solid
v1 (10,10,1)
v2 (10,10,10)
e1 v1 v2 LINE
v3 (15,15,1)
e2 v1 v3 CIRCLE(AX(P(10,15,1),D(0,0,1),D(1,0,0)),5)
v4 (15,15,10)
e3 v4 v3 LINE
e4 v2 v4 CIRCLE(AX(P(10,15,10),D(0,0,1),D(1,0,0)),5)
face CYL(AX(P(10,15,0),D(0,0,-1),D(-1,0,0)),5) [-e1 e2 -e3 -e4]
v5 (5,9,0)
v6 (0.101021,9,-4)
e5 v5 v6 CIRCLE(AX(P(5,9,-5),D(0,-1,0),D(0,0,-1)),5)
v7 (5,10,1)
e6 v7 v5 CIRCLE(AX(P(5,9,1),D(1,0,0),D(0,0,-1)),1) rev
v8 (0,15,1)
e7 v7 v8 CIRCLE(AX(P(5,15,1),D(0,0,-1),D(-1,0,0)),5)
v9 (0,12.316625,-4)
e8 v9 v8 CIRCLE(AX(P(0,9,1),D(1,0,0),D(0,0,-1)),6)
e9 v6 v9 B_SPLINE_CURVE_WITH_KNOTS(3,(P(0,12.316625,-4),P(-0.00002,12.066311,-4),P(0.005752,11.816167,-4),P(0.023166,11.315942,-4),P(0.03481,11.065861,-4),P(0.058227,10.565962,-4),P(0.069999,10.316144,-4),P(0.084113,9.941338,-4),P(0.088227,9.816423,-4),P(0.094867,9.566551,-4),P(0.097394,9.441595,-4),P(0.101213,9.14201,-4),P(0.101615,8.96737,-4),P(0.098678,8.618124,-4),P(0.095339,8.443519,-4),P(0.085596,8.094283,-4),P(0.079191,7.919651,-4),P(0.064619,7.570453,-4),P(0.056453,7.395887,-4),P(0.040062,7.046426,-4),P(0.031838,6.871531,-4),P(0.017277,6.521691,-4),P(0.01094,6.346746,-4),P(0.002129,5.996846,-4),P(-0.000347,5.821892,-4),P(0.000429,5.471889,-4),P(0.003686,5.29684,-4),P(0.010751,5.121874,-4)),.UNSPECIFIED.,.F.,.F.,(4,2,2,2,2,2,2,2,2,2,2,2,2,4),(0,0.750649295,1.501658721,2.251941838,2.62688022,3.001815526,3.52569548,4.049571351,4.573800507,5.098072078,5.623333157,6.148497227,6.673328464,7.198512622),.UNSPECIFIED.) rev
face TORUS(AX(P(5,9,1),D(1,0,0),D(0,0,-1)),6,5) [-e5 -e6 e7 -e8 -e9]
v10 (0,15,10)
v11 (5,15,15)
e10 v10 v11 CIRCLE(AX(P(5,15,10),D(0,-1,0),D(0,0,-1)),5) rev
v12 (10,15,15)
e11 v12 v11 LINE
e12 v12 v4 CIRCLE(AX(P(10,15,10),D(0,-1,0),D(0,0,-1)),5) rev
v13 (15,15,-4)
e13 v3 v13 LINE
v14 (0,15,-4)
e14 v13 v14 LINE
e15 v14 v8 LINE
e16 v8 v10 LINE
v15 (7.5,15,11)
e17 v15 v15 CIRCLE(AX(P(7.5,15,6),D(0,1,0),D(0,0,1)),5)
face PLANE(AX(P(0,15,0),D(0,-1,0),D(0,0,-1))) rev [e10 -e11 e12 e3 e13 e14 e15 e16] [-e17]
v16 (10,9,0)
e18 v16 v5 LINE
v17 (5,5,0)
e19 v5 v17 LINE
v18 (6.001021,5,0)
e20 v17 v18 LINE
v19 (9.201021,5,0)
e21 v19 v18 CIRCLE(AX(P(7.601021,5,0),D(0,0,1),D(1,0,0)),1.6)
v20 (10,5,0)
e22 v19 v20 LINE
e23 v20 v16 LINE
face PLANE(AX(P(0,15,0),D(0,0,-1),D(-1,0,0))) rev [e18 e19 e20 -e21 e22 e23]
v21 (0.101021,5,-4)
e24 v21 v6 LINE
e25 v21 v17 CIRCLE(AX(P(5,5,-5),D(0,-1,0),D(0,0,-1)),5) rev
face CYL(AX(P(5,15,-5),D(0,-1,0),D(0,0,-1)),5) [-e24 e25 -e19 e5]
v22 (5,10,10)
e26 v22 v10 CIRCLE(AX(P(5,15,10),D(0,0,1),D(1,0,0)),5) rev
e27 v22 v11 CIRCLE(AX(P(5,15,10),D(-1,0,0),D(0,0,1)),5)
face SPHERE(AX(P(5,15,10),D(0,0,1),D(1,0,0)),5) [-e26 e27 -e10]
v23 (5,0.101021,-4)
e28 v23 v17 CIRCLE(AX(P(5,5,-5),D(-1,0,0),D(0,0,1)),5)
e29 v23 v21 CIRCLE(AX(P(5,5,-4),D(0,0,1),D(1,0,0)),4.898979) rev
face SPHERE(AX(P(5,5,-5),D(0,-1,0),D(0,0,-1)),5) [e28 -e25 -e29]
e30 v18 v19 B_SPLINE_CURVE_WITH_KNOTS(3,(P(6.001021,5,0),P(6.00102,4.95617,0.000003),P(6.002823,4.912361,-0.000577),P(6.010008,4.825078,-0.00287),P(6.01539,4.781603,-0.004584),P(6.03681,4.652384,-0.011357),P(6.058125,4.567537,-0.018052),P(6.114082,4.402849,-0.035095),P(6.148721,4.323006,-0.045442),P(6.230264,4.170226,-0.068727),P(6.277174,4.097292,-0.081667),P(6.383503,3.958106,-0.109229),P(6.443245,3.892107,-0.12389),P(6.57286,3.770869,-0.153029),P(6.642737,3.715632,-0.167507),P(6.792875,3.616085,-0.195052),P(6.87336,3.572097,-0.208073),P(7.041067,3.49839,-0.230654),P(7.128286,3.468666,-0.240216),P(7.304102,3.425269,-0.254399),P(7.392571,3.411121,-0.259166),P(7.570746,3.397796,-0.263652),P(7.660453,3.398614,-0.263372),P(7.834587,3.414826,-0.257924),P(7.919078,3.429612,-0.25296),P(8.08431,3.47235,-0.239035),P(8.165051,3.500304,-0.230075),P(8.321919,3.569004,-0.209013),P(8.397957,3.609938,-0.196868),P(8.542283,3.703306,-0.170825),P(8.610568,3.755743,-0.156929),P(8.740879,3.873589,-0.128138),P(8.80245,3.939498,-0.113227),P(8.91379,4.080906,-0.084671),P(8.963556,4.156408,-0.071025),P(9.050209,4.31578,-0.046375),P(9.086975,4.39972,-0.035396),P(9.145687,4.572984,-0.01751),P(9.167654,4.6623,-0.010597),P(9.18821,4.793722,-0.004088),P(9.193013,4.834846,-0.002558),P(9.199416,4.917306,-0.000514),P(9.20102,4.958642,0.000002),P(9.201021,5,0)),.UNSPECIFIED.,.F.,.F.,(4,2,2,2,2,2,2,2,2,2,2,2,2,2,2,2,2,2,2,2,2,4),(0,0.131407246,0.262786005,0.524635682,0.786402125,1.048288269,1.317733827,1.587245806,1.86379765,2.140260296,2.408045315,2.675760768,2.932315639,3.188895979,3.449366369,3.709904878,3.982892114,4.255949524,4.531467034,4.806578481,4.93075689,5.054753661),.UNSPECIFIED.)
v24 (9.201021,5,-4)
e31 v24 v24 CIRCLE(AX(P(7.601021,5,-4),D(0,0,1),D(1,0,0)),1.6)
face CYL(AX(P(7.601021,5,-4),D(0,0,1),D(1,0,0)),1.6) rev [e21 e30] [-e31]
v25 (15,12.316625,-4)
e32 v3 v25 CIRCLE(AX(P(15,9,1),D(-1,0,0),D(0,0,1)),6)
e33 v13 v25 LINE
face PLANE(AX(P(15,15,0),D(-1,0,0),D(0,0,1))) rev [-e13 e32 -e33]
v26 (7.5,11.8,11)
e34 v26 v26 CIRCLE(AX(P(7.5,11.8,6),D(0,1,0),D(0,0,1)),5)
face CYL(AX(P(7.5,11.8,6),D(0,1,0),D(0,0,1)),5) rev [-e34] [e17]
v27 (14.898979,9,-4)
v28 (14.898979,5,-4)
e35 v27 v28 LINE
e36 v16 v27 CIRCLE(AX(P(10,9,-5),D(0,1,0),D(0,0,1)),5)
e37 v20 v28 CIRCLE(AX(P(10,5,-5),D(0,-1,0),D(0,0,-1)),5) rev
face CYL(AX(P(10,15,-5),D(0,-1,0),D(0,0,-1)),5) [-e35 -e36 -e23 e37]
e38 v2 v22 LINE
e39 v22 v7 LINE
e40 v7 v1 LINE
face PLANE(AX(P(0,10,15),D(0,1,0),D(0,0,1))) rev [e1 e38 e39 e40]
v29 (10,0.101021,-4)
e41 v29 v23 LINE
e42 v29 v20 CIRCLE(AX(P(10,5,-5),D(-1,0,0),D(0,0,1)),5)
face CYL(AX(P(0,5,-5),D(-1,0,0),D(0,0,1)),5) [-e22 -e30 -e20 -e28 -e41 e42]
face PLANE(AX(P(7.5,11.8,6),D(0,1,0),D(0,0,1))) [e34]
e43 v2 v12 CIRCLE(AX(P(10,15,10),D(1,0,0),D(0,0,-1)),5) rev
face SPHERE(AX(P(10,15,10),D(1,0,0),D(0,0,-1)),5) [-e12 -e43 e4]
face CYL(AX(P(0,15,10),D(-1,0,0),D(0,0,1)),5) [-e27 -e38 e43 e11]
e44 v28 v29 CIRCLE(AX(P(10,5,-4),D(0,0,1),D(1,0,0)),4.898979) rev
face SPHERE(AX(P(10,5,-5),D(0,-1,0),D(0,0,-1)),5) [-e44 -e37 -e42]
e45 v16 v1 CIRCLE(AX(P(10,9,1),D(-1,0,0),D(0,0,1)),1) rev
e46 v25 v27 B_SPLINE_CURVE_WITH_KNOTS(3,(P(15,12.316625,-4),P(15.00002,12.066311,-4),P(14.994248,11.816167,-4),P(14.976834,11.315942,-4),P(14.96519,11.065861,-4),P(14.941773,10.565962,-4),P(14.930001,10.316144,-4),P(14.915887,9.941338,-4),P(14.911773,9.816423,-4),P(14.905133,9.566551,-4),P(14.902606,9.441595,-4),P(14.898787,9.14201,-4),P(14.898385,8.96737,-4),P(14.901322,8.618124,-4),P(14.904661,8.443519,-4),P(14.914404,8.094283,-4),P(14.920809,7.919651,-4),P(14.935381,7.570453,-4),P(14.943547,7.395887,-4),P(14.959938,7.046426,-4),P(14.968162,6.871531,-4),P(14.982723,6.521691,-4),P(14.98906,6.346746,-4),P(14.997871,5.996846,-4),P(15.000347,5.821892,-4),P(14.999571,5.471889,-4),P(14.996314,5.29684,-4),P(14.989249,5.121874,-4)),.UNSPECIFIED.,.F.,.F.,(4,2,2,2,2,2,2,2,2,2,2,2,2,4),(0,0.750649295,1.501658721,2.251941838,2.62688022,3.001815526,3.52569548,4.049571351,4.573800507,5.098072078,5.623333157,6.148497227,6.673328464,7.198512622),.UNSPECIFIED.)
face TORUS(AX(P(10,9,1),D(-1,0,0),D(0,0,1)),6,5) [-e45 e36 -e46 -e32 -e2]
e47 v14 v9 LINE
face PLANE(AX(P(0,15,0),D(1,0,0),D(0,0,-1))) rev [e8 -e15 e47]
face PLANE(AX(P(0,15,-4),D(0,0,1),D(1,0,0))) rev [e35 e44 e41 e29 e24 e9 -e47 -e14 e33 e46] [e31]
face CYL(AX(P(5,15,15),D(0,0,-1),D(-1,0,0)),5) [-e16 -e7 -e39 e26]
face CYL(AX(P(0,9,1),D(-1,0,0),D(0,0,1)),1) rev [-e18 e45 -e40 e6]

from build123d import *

# Parameters (mm, degrees)
SKETCH1_W           = 15
SKETCH1_H           = 4
BOSS_EXTRUDE1_DEPTH = 15
SKETCH2_W           = 15
SKETCH2_H           = 5
BOSS_EXTRUDE2_DEPTH = 15
FILLET1_R           = 1
FILLET3_R           = 5
SKETCH3_R           = 5
CUT_EXTRUDE1_DEPTH  = 3.2
SKETCH4_R           = 1.6
CUT_EXTRUDE2_DEPTH  = 26.980762229
FILLET4_R           = 5


with BuildPart() as part:
    # Sketch1 → Boss-Extrude1 (new body)
    with BuildSketch(Plane(origin=(0, 0, 0), x_dir=(1, 0, 0), z_dir=(0, 1, 0))):
        with Locations((7.5, 2)):
            Rectangle(SKETCH1_W, SKETCH1_H)
    extrude(amount=BOSS_EXTRUDE1_DEPTH)

    # Sketch2 → Boss-Extrude2 (add)
    with BuildSketch(Plane.XY):
        with Locations((7.5, 12.5)):
            Rectangle(SKETCH2_W, SKETCH2_H)
    extrude(amount=BOSS_EXTRUDE2_DEPTH)

    # Fillet1
    fillet1_edges = [part.edges().sort_by_distance(p)[0] for p in [
        (7.5, 10, 0),
    ]]
    fillet(fillet1_edges, radius=FILLET1_R)

    # Fillet3
    # the kernel refuses this fillet: 5 mm, written as the material it takes off along each edge
    with BuildSketch(Plane(origin=(5, 15, 10), x_dir=(0, -1, 0), z_dir=(-1, 0, 0))) as fillet3_piece_1_section:
        Polygon((0, 0), (FILLET3_R * 1.02, 0), (FILLET3_R * 1.02, FILLET3_R * 1.02), (0, FILLET3_R * 1.02), align=None)
    fillet3_piece_1 = extrude(amount=FILLET3_R * 1.02, mode=Mode.PRIVATE)
    fillet3_piece_1 = fillet3_piece_1 - Plane(origin=(5, 15, 10), x_dir=(0, 0.7071067811865475, -0.7071067811865475), z_dir=(-1, 0, 0)) * Sphere(FILLET3_R, mode=Mode.PRIVATE)
    add(fillet3_piece_1, mode=Mode.SUBTRACT)
    with BuildSketch(Plane(origin=(10, 15, 10), x_dir=(0, -1, 0), z_dir=(1, 0, 0))) as fillet3_piece_2_section:
        Polygon((0, 0), (FILLET3_R * 1.02, 0), (FILLET3_R * 1.02, -FILLET3_R * 1.02), (0, -FILLET3_R * 1.02), align=None)
    fillet3_piece_2 = extrude(amount=FILLET3_R * 1.02, mode=Mode.PRIVATE)
    fillet3_piece_2 = fillet3_piece_2 - Plane(origin=(10, 15, 10), x_dir=(0, 0.7071067811865475, -0.7071067811865475), z_dir=(1, 0, 0)) * Sphere(FILLET3_R, mode=Mode.PRIVATE)
    add(fillet3_piece_2, mode=Mode.SUBTRACT)
    with BuildSketch(Plane(origin=(0, 10, 1), x_dir=(0, 1, 0), z_dir=(0, 0, 1))) as fillet3_piece_3:
        with BuildLine():
            CenterArc((FILLET3_R, -FILLET3_R), FILLET3_R, 90, 90)
            Line((0, -FILLET3_R), (0, 0))
            Line((0, 0), (FILLET3_R, 0))
        make_face()
    extrude(amount=9, mode=Mode.SUBTRACT)
    with BuildSketch(Plane(origin=(15, 10, 1), x_dir=(0, 1, 0), z_dir=(0, 0, 1))) as fillet3_piece_4:
        with BuildLine():
            CenterArc((FILLET3_R, FILLET3_R), FILLET3_R, 180, 90)
            Line((0, FILLET3_R), (0, 0))
            Line((0, 0), (FILLET3_R, 0))
        make_face()
    extrude(amount=9, mode=Mode.SUBTRACT)
    with BuildSketch(Plane(origin=(10, 10, 15), x_dir=(0, 0, -1), z_dir=(-1, 0, 0))) as fillet3_piece_5:
        with BuildLine():
            CenterArc((FILLET3_R, -FILLET3_R), FILLET3_R, 90, 90)
            Line((0, -FILLET3_R), (0, 0))
            Line((0, 0), (FILLET3_R, 0))
        make_face()
    extrude(amount=5, mode=Mode.SUBTRACT)
    with BuildSketch(Plane(origin=(0, -12.5, 0), x_dir=(1, 0, 0), z_dir=(0, 1, 0))) as fillet3_piece_6:
        with BuildLine():
            CenterArc((FILLET3_R, FILLET3_R), FILLET3_R, 180, 90)
            Line((0, FILLET3_R), (0, 0))
            Line((0, 0), (FILLET3_R, 0))
        make_face()
    extrude(amount=21.5, mode=Mode.SUBTRACT)
    with BuildSketch(Plane(origin=(15, -12.5, 0), x_dir=(-1, 0, 0), z_dir=(0, 1, 0))) as fillet3_piece_7:
        with BuildLine():
            CenterArc((FILLET3_R, -FILLET3_R), FILLET3_R, 90, 90)
            Line((0, -FILLET3_R), (0, 0))
            Line((0, 0), (FILLET3_R, 0))
        make_face()
    extrude(amount=21.5, mode=Mode.SUBTRACT)
    with BuildSketch(Plane(origin=(15, 9, 1), x_dir=(0, 0, -1), z_dir=(0, -1, 0))) as fillet3_piece_8:
        with BuildLine():
            CenterArc((1 + FILLET3_R, -FILLET3_R), FILLET3_R, 90, 90)
            Line((1, -FILLET3_R), (1, 0))
            Line((1, 0), (1 + FILLET3_R, 0))
        make_face()
    revolve(axis=Axis((15, 9, 1), (1, 0, 0)), revolution_arc=90, mode=Mode.SUBTRACT)
    with BuildSketch(Plane(origin=(0, 9, 1), x_dir=(0, 0, -1), z_dir=(0, -1, 0))) as fillet3_piece_9:
        with BuildLine():
            CenterArc((1 + FILLET3_R, FILLET3_R), FILLET3_R, 180, 90)
            Line((1 + FILLET3_R, 0), (1, 0))
            Line((1, 0), (1, FILLET3_R))
        make_face()
    revolve(axis=Axis((0, 9, 1), (1, 0, 0)), revolution_arc=90, mode=Mode.SUBTRACT)

    # Sketch3 → Cut-Extrude1 (cut)
    with BuildSketch(Plane(origin=(0, 15, 0), x_dir=(1, 0, 0), z_dir=(0, 1, 0))):
        with Locations(Location((7.5, -6, 0), (0, 0, 270))):
            Circle(SKETCH3_R)
    extrude(amount=-CUT_EXTRUDE1_DEPTH, mode=Mode.SUBTRACT)

    # Sketch4 → Cut-Extrude2 (cut, through all)
    with BuildSketch(Plane.XY):
        with Locations((7.601020514, 5)):
            Circle(SKETCH4_R)
    extrude(amount=-CUT_EXTRUDE2_DEPTH, mode=Mode.SUBTRACT)

    # Fillet4
    # the kernel refuses this fillet: 5 mm, written as the material it takes off along each edge
    with BuildSketch(Plane(origin=(5, 0, -5), x_dir=(0, 0, 1), z_dir=(1, 0, 0))) as fillet4_piece_1:
        with BuildLine():
            CenterArc((5 - FILLET4_R, -FILLET4_R), FILLET4_R, 0, 90)
            Line((5 - FILLET4_R, 0), (5, 0))
            Line((5, 0), (5, -FILLET4_R))
        make_face()
    revolve(axis=Axis((5, 0, -5), (0, -1, 0)), revolution_arc=221.746220733, mode=Mode.SUBTRACT)
    with BuildSketch(Plane(origin=(10, 0, -5), x_dir=(-0.6658324541231062, 0, -0.7461012954260312), z_dir=(-0.7461012954260312, 0, 0.6658324541231062))) as fillet4_piece_2:
        with BuildLine():
            CenterArc((5 - FILLET4_R, -FILLET4_R), FILLET4_R, 0, 90)
            Line((5 - FILLET4_R, 0), (5, 0))
            Line((5, 0), (5, -FILLET4_R))
        make_face()
    revolve(axis=Axis((10, 0, -5), (0, -1, 0)), revolution_arc=221.746220733, mode=Mode.SUBTRACT)
    with BuildSketch(Plane(origin=(5, 0, 0), x_dir=(0, 1, 0), z_dir=(1, 0, 0))) as fillet4_piece_3:
        with BuildLine():
            CenterArc((FILLET4_R, -FILLET4_R), FILLET4_R, 90, 90)
            Line((0, -FILLET4_R), (0, 0))
            Line((0, 0), (FILLET4_R, 0))
        make_face()
    extrude(amount=5, mode=Mode.SUBTRACT)


solid = part.part
